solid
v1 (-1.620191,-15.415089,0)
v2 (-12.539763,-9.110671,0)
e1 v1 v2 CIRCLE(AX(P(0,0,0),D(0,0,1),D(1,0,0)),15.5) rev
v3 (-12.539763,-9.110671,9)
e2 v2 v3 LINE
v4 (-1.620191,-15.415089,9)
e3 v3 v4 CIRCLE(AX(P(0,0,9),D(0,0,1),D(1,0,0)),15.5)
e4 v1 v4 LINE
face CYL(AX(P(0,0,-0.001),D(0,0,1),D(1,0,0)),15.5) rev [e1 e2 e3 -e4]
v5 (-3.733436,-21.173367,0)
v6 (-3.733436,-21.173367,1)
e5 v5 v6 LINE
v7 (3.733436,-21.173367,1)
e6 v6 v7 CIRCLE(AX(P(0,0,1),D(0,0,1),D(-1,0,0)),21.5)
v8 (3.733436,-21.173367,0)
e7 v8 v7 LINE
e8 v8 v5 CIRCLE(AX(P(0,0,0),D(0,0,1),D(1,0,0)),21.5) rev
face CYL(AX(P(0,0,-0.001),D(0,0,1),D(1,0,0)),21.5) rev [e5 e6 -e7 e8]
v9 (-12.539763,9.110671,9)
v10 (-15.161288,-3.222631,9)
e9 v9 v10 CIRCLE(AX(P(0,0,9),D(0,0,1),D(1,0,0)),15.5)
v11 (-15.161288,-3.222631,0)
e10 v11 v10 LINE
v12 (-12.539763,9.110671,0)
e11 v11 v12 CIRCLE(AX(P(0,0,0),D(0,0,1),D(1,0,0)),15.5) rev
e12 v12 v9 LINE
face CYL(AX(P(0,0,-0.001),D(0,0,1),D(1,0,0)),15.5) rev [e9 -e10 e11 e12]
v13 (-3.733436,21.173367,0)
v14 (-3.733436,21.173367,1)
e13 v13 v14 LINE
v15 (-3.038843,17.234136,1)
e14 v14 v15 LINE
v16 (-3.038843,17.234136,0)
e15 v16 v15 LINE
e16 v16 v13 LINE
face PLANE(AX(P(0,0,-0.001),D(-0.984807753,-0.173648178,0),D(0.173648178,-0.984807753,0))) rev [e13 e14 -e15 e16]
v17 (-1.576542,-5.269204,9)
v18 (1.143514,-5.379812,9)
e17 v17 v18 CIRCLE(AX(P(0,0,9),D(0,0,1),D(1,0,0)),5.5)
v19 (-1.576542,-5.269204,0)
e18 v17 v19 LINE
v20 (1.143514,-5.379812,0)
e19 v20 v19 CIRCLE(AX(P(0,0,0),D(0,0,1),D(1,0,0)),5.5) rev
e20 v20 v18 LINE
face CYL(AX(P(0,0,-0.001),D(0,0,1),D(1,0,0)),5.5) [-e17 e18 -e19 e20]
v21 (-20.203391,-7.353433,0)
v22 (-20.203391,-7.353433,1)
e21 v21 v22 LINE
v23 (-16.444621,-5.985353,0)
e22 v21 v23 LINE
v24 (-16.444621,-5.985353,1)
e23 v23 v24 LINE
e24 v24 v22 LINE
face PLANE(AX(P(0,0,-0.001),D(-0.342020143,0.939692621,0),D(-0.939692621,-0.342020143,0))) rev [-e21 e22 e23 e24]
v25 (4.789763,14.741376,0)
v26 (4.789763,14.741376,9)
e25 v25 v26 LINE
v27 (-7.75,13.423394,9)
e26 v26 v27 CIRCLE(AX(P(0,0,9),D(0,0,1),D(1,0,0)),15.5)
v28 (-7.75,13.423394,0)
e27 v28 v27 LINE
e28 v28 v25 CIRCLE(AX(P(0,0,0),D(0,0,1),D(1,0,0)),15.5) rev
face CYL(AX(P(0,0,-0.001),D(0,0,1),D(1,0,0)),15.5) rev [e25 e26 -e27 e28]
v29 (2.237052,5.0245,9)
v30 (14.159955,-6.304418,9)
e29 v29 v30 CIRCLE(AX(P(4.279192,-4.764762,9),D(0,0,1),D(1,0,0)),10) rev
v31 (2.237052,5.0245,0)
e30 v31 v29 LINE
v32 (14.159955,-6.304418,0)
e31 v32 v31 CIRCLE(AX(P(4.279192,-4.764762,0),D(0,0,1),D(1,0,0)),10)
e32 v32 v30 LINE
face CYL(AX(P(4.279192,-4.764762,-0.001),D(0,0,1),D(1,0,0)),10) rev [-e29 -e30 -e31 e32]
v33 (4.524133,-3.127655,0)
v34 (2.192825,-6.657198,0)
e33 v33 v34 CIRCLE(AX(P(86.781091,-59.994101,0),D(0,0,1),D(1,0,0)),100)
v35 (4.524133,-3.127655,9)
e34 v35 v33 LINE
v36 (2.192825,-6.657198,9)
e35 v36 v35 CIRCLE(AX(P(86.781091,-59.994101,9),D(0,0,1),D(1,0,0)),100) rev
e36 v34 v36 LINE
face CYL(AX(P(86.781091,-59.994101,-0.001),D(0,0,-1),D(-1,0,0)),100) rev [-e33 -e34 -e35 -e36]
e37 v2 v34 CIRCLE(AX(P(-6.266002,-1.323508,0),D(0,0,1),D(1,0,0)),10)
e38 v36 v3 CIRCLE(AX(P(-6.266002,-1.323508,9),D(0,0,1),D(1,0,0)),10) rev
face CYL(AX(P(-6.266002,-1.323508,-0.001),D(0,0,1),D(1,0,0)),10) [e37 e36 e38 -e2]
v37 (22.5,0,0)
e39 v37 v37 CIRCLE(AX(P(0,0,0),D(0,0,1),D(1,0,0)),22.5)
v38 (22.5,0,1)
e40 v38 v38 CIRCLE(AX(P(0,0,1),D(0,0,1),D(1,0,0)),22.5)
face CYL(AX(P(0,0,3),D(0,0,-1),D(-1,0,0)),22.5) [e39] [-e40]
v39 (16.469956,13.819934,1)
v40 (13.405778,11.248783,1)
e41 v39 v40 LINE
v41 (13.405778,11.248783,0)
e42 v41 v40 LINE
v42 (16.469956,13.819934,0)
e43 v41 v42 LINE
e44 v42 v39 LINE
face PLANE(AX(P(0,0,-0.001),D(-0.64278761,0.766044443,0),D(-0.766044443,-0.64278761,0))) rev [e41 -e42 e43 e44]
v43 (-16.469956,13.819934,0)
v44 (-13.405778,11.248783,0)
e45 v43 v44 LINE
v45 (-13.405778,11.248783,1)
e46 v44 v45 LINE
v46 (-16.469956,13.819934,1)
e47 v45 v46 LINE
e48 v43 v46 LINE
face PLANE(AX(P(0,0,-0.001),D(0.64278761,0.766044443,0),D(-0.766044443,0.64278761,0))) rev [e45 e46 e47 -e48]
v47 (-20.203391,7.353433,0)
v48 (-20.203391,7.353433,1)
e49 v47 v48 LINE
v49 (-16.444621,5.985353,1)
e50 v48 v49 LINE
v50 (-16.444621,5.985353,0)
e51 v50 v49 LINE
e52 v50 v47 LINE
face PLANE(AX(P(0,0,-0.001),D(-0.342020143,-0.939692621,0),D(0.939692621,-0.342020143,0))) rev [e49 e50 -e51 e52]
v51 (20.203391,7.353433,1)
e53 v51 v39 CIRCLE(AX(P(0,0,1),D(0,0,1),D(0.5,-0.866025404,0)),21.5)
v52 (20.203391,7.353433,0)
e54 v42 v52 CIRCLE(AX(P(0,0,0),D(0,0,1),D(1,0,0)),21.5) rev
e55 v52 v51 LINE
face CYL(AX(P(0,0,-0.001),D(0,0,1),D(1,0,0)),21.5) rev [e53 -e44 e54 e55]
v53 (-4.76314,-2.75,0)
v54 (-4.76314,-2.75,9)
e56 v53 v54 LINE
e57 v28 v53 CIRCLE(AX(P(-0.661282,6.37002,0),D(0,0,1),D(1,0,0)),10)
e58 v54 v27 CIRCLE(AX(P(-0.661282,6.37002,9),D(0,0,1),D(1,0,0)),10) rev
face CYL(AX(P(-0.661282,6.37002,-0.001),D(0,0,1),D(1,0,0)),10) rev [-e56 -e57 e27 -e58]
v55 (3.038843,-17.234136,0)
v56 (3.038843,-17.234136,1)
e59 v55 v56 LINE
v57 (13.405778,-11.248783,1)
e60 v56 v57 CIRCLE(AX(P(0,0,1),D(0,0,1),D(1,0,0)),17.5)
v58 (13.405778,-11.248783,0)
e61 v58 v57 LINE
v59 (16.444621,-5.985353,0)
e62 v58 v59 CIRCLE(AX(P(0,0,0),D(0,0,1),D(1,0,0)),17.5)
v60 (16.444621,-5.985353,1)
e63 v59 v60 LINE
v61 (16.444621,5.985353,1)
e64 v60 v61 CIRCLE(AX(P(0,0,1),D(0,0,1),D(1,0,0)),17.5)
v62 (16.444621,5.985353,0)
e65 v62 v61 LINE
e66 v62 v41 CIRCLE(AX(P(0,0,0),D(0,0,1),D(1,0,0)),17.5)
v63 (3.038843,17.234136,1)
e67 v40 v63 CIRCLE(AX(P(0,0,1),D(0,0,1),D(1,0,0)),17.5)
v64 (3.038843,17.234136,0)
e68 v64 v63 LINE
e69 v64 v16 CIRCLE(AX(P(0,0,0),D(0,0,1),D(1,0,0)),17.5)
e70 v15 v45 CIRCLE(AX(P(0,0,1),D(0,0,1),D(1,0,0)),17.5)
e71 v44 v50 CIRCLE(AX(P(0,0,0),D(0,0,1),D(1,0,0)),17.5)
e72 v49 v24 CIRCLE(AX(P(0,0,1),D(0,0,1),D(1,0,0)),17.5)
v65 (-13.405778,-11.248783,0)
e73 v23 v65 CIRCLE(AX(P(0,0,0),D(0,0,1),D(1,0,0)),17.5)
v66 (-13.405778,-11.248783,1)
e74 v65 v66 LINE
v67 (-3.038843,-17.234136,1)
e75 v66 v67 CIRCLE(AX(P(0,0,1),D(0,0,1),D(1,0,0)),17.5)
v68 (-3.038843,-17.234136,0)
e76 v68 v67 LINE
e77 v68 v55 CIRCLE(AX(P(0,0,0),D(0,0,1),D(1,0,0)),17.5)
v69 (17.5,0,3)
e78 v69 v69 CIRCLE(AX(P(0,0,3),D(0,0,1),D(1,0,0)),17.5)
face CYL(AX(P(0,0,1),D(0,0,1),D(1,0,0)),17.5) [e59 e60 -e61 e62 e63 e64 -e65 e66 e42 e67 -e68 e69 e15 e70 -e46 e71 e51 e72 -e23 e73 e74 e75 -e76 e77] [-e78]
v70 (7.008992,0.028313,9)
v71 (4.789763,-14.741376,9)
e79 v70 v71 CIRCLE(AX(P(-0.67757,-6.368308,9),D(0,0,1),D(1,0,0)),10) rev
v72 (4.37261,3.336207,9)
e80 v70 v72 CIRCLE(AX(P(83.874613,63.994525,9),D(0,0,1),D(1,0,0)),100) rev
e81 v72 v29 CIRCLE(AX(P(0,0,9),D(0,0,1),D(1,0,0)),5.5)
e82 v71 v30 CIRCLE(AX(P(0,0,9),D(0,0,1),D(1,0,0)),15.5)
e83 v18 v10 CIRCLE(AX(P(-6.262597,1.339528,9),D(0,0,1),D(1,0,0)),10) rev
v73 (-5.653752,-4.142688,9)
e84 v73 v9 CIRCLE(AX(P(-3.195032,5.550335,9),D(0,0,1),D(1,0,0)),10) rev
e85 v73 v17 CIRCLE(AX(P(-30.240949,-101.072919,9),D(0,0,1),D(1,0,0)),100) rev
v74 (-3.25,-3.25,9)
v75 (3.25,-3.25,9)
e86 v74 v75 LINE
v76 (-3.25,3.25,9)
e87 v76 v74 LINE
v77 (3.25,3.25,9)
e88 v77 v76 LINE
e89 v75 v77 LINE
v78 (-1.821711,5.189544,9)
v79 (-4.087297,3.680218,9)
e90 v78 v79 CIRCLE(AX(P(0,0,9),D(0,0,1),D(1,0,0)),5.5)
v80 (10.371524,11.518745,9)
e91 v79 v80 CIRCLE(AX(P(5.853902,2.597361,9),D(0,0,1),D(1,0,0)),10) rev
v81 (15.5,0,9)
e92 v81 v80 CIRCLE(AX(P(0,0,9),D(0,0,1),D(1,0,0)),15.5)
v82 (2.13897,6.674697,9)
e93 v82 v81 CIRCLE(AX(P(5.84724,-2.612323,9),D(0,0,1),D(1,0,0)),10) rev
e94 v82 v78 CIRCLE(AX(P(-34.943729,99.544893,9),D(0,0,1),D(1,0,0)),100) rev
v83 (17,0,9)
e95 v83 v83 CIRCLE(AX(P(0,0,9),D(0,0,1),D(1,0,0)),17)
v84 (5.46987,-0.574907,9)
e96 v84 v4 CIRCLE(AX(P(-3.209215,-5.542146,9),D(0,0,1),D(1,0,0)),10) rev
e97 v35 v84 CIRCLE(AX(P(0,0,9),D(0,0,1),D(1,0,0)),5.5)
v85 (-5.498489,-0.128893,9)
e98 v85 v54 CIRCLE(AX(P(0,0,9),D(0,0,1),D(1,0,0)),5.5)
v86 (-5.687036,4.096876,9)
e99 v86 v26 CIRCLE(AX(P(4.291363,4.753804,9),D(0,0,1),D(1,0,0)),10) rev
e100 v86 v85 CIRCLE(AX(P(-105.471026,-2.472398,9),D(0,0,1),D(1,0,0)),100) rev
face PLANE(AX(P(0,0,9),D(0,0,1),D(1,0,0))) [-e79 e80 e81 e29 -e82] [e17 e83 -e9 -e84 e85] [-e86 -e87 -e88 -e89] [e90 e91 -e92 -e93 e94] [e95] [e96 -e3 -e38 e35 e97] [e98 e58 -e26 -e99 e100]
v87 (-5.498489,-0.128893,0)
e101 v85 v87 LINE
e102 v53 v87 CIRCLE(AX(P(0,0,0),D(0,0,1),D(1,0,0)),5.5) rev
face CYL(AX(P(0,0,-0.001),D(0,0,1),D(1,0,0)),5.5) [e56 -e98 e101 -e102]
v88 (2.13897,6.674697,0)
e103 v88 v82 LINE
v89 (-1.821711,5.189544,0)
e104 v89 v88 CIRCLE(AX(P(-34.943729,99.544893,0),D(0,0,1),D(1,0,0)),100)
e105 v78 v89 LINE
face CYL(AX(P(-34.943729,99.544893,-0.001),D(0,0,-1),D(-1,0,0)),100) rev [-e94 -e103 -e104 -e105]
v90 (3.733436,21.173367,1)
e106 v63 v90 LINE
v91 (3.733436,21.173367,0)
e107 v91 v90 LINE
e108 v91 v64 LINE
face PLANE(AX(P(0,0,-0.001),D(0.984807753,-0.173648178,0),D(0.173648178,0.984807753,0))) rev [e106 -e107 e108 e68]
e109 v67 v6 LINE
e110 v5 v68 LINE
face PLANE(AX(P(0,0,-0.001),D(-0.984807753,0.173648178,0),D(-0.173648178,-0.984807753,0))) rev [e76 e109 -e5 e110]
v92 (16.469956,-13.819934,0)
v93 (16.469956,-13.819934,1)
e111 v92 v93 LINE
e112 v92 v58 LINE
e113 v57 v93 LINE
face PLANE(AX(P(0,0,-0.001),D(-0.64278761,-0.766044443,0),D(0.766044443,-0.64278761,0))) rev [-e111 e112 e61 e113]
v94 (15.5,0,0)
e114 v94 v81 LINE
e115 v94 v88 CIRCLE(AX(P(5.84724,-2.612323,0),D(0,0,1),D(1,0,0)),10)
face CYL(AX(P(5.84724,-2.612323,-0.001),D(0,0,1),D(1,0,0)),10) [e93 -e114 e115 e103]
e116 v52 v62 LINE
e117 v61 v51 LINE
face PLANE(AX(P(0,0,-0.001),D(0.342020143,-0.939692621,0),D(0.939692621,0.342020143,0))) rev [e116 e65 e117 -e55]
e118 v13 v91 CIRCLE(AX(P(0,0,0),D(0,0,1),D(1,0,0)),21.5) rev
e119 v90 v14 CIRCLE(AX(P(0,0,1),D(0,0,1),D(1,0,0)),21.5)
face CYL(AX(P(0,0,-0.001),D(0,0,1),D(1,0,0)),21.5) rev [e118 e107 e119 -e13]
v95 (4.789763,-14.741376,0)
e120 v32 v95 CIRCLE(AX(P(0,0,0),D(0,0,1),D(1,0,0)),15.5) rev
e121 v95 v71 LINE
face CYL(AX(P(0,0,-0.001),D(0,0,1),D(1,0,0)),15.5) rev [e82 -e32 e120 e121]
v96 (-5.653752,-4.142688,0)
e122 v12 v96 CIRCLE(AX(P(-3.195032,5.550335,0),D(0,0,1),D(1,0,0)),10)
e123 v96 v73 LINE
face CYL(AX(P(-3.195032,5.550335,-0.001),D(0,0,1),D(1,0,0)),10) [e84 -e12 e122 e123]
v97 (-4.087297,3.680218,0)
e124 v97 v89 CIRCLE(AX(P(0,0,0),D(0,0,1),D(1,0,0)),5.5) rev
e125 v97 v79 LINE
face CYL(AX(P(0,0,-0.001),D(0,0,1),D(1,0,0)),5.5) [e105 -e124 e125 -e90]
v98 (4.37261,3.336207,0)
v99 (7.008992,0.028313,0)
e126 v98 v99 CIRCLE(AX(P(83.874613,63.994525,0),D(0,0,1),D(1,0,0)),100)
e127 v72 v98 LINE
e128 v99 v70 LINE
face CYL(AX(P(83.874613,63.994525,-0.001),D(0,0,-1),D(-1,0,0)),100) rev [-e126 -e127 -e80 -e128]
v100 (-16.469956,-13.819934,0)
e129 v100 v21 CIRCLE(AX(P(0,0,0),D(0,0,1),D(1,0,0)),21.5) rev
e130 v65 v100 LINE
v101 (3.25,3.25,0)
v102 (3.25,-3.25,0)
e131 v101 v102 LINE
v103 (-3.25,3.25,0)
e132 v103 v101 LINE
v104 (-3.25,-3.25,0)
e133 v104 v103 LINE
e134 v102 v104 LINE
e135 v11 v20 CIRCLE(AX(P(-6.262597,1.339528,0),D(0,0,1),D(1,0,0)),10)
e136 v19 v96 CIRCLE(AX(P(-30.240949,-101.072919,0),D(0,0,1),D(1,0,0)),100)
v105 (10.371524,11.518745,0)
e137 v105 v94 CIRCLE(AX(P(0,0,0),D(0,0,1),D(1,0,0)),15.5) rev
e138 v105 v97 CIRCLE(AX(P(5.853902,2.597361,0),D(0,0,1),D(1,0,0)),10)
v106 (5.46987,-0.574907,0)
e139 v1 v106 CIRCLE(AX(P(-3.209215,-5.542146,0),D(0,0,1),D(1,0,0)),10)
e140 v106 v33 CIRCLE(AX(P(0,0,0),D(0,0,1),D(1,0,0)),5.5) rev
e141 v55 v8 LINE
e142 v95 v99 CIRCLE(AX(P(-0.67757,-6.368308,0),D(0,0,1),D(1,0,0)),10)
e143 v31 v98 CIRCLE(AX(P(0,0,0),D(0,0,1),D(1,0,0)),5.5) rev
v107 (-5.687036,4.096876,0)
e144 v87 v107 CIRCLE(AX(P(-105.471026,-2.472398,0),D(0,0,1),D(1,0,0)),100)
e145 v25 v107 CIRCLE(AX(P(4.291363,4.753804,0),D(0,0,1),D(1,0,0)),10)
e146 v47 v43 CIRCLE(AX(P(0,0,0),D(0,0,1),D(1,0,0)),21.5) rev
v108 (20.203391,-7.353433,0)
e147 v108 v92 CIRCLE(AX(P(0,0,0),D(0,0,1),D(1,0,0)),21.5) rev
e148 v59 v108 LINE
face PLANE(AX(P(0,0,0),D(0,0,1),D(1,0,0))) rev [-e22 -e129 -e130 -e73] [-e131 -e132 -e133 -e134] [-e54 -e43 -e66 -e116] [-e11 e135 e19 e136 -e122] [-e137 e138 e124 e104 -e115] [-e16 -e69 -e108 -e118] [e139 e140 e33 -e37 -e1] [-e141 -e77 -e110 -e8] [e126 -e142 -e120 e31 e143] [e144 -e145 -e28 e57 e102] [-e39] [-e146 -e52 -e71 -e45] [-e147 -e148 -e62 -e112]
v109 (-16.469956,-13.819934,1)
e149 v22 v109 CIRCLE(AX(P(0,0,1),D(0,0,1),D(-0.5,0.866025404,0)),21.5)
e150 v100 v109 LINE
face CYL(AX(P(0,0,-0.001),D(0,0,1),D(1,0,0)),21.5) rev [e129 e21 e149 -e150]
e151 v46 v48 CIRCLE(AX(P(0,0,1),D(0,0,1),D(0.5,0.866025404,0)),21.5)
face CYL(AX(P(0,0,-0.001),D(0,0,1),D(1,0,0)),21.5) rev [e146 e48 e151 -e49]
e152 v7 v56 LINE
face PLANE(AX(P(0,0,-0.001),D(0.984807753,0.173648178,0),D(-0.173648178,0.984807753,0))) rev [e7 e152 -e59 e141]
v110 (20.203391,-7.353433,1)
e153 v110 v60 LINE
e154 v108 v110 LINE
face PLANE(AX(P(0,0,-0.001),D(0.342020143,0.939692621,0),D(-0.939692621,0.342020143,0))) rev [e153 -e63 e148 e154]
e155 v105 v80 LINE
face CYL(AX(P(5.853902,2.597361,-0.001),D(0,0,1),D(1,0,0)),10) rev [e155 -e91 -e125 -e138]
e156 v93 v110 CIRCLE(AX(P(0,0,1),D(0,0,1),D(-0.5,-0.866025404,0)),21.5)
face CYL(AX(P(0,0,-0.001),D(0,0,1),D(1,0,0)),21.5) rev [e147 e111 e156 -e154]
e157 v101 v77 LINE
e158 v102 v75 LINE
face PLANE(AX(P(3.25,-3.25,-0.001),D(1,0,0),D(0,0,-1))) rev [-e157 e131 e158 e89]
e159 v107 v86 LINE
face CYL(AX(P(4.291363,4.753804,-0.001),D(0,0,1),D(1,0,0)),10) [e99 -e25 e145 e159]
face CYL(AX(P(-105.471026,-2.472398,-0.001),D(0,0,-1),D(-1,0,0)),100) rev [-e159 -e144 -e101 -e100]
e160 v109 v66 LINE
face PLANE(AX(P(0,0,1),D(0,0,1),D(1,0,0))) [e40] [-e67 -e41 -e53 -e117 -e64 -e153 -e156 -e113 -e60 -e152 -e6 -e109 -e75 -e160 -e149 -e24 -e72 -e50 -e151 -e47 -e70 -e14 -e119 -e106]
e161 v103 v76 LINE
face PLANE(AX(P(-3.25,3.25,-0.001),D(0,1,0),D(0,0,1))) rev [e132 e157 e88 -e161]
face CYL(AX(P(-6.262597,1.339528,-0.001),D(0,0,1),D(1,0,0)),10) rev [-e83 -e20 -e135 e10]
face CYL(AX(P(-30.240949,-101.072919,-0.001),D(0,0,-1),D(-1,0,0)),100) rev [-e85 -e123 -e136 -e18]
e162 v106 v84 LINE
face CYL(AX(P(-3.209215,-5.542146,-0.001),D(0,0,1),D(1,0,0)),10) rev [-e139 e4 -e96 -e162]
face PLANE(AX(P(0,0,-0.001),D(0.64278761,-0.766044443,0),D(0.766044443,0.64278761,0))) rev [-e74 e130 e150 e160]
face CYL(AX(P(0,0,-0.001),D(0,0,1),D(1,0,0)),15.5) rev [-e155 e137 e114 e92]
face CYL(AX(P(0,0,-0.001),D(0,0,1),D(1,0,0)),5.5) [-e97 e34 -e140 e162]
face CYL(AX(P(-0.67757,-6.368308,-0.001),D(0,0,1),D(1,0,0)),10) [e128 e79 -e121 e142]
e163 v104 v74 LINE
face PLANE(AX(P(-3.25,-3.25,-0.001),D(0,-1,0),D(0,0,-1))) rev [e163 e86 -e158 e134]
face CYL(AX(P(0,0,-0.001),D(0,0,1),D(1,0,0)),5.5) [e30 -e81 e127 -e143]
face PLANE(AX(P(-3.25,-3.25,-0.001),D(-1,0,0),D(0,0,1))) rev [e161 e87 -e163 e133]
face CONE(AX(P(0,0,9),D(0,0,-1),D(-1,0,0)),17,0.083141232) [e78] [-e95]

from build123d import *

# Parameters (mm, degrees)
SKETCH1_R           = 22.5
BOSS_EXTRUDE1_DEPTH = 3
SKETCH2_R           = 17.5
BOSS_EXTRUDE2_DEPTH = 6
CHAMFER1_SIZE       = 6
CHAMFER1_SIZE_2     = 0.5
CUT_EXTRUDE1_REACH  = 35.068
FILLET1_R           = 100
CUT_EXTRUDE2_REACH  = 35.068
SKETCH4_W           = 6.5
SKETCH4_H           = 6.5
CUT_EXTRUDE3_START  = -2
SKETCH6_R           = 22.5
SKETCH6_R_2         = 17.5
CUT_EXTRUDE3_DEPTH  = 2
CUT_EXTRUDE4_REACH  = 34.81
CIRPATTERN1_COUNT   = 6


with BuildPart() as part:
    # Sketch1 → Boss-Extrude1 (new body)
    with BuildSketch(Plane.XY):
        Circle(SKETCH1_R)
    extrude(amount=BOSS_EXTRUDE1_DEPTH)

    # Sketch2 → Boss-Extrude2 (add)
    with BuildSketch(Plane.XY.offset(3)):
        Circle(SKETCH2_R)
    extrude(amount=BOSS_EXTRUDE2_DEPTH)

    # Chamfer1
    # the kernel refuses this chamfer: 6, 0.5 mm, written as the material it takes off along each edge
    with BuildSketch(Plane(origin=(0, 0, 9), x_dir=(1, 0, 0), z_dir=(0, -1, 0))) as chamfer1_piece_1_section:
        Polygon((17.5, -CHAMFER1_SIZE), (17.5 - CHAMFER1_SIZE_2, 0), (17.5, 0), align=None)
    chamfer1_piece_1 = revolve(axis=Axis((0, 0, 9), (0, 0, 1)), mode=Mode.PRIVATE)
    chamfer1_piece_1 = split(chamfer1_piece_1, bisect_by=Plane(origin=(-17.303133917, 0, 3), z_dir=(0, 0, 1)), keep=Keep.TOP, mode=Mode.PRIVATE)
    add(chamfer1_piece_1, mode=Mode.SUBTRACT)

    # Sketch3 → Cut-Extrude1 (cut, up to next)
    with BuildSketch(Plane.XY.offset(9), mode=Mode.PRIVATE) as cut_extrude1_sk1:
        with BuildLine():
            ThreePointArc((0, 5.5), (9.191338757, 6.81195468), (15.5, 0))
            ThreePointArc((15.5, 0), (14.159954593, 6.304417968), (10.371524399, 11.518744795))
            ThreePointArc((10.371524399, 11.518744795), (1.087937204, 11.388583202), (-4.08729654, 3.680218335))
            ThreePointArc((-4.08729654, 3.680218335), (-2.237051537, 5.024500017), (0, 5.5))
        make_face()
    cut_extrude1_tool1 = extrude(cut_extrude1_sk1.sketch, amount=-CUT_EXTRUDE1_REACH, mode=Mode.PRIVATE) & part.part
    # Sketch3 → Cut-Extrude1 (cut, up to next)
    with BuildSketch(Plane.XY.offset(9), mode=Mode.PRIVATE) as cut_extrude1_sk2:
        with BuildLine():
            ThreePointArc((14.159954593, -6.304417968), (11.167377351, 2.484575984), (2.237051537, 5.024500017))
            ThreePointArc((2.237051537, 5.024500017), (4.08729654, 3.680218335), (5.23081084, 1.699593469))
            ThreePointArc((5.23081084, 1.699593469), (9.318833764, -6.636472858), (4.789763413, -14.741376003))
            ThreePointArc((4.789763413, -14.741376003), (10.371524399, -11.518744795), (14.159954593, -6.304417968))
        make_face()
    cut_extrude1_tool2 = extrude(cut_extrude1_sk2.sketch, amount=-CUT_EXTRUDE1_REACH, mode=Mode.PRIVATE) & part.part
    # Sketch3 → Cut-Extrude1 (cut, up to next)
    with BuildSketch(Plane.XY.offset(9), mode=Mode.PRIVATE) as cut_extrude1_sk3:
        with BuildLine():
            ThreePointArc((-5.23081084, 1.699593469), (-3.63827401, 10.84649238), (4.789763413, 14.741376003))
            ThreePointArc((4.789763413, 14.741376003), (-1.620191181, 15.415089378), (-7.75, 13.423393759))
            ThreePointArc((-7.75, 13.423393759), (-10.494995181, 4.553955519), (-4.763139721, -2.75))
            ThreePointArc((-4.763139721, -2.75), (-5.469870425, -0.574906548), (-5.23081084, 1.699593469))
        make_face()
    cut_extrude1_tool3 = extrude(cut_extrude1_sk3.sketch, amount=-CUT_EXTRUDE1_REACH, mode=Mode.PRIVATE) & part.part
    # Sketch3 → Cut-Extrude1 (cut, up to next)
    with BuildSketch(Plane.XY.offset(9), mode=Mode.PRIVATE) as cut_extrude1_sk4:
        with BuildLine():
            ThreePointArc((-1.620191181, -15.415089378), (5.813881563, -9.853030796), (5.469870425, -0.574906548))
            ThreePointArc((5.469870425, -0.574906548), (4.763139721, -2.75), (3.232818888, -4.449593469))
            ThreePointArc((3.232818888, -4.449593469), (-3.431982756, -10.913520471), (-12.539763413, -9.110671411))
            ThreePointArc((-12.539763413, -9.110671411), (-7.75, -13.423393759), (-1.620191181, -15.415089378))
        make_face()
    cut_extrude1_tool4 = extrude(cut_extrude1_sk4.sketch, amount=-CUT_EXTRUDE1_REACH, mode=Mode.PRIVATE) & part.part
    # Sketch3 → Cut-Extrude1 (cut, up to next)
    with BuildSketch(Plane.XY.offset(9), mode=Mode.PRIVATE) as cut_extrude1_sk5:
        with BuildLine():
            ThreePointArc((-3.232818888, -4.449593469), (-11.439915756, -0.10845373), (-12.539763413, 9.110671411))
            ThreePointArc((-12.539763413, 9.110671411), (-15.161287811, 3.222631208), (-15.161287811, -3.222631208))
            ThreePointArc((-15.161287811, -3.222631208), (-7.574200938, -8.574083908), (1.143514299, -5.379811804))
            ThreePointArc((1.143514299, -5.379811804), (-1.143514299, -5.379811804), (-3.232818888, -4.449593469))
        make_face()
    cut_extrude1_tool5 = extrude(cut_extrude1_sk5.sketch, amount=-CUT_EXTRUDE1_REACH, mode=Mode.PRIVATE) & part.part
    add(cut_extrude1_tool1.solids().sort_by_distance((5.79241, 8.44736, 9))[0], mode=Mode.SUBTRACT)
    add(cut_extrude1_tool2.solids().sort_by_distance((9.82387, -2.898532, 9))[0], mode=Mode.SUBTRACT)
    add(cut_extrude1_tool3.solids().sort_by_distance((-6.243964, 8.119288, 9))[0], mode=Mode.SUBTRACT)
    add(cut_extrude1_tool4.solids().sort_by_distance((0.279075, -10.238752, 9))[0], mode=Mode.SUBTRACT)
    add(cut_extrude1_tool5.solids().sort_by_distance((-9.651392, -3.429365, 9))[0], mode=Mode.SUBTRACT)

    # Fillet1
    fillet1_edges = [part.edges().sort_by_distance(p)[0] for p in [
        (3.232818888, -4.449593469, 4.5),
        (5.23081084, 1.699593469, 4.5),
        (-5.23081084, 1.699593469, 4.5),
        (-3.232818888, -4.449593469, 4.5),
        (0, 5.5, 4.5),
    ]]
    fillet(fillet1_edges, radius=FILLET1_R)

    # Sketch4 → Cut-Extrude2 (cut, up to next)
    with BuildSketch(Plane.XY.offset(9), mode=Mode.PRIVATE) as cut_extrude2_sk1:
        Rectangle(SKETCH4_W, SKETCH4_H)
    cut_extrude2_tool1 = extrude(cut_extrude2_sk1.sketch, amount=-CUT_EXTRUDE2_REACH, mode=Mode.PRIVATE) & part.part
    add(cut_extrude2_tool1.solids().sort_by_distance((0, 0, 9))[0], mode=Mode.SUBTRACT)

    # Sketch6 → Cut-Extrude3 (cut)
    with BuildSketch(Plane.XY.offset(3).offset(CUT_EXTRUDE3_START)):
        Circle(SKETCH6_R)
        Circle(SKETCH6_R_2, mode=Mode.SUBTRACT)
    extrude(amount=CUT_EXTRUDE3_DEPTH, mode=Mode.SUBTRACT)

    # Sketch7 → Cut-Extrude4 (cut, up to next)
    with BuildSketch(Plane.XY.offset(1), mode=Mode.PRIVATE) as cut_extrude4_sk1:
        with BuildLine():
            Line((3.73343582, 21.17336669), (-3.73343582, 21.17336669))
            Line((-3.73343582, 21.17336669), (-3.038843109, 17.234135678))
            ThreePointArc((-3.038843109, 17.234135678), (0, 17.5), (3.038843109, 17.234135678))
            Line((3.038843109, 17.234135678), (3.73343582, 21.17336669))
        make_face()
    cut_extrude4_tool1 = extrude(cut_extrude4_sk1.sketch, amount=-CUT_EXTRUDE4_REACH, mode=Mode.PRIVATE) & part.part
    # Sketch7 → Cut-Extrude4 (cut, up to next)
    with BuildSketch(Plane.XY.offset(1), mode=Mode.PRIVATE) as cut_extrude4_sk2:
        with BuildLine():
            ThreePointArc((3.73343582, 21.17336669), (0, 21.5), (-3.73343582, 21.17336669))
            Line((-3.73343582, 21.17336669), (3.73343582, 21.17336669))
        make_face()
    cut_extrude4_tool2 = extrude(cut_extrude4_sk2.sketch, amount=-CUT_EXTRUDE4_REACH, mode=Mode.PRIVATE) & part.part
    cut_extrude4_1 = cut_extrude4_tool1.solids().sort_by_distance((0, 19.352452, 1))[0]
    add(cut_extrude4_1, mode=Mode.SUBTRACT)
    cut_extrude4_2 = cut_extrude4_tool2.solids().sort_by_distance((0, 21.304105, 1))[0]
    add(cut_extrude4_2, mode=Mode.SUBTRACT)
    cut_extrude4 = cut_extrude4_1 + cut_extrude4_2  # Cut-Extrude4 as one shape, for the pattern or mirror that repeats it

    # CirPattern1: Cut-Extrude4 ×6 about axis
    cirpattern1_axis = Axis((0, 0, 0), (0, 0, 1))
    for i in range(1, CIRPATTERN1_COUNT):
        add(cut_extrude4.rotate(cirpattern1_axis, i * 360 / CIRPATTERN1_COUNT), mode=Mode.SUBTRACT)


solid = part.part
